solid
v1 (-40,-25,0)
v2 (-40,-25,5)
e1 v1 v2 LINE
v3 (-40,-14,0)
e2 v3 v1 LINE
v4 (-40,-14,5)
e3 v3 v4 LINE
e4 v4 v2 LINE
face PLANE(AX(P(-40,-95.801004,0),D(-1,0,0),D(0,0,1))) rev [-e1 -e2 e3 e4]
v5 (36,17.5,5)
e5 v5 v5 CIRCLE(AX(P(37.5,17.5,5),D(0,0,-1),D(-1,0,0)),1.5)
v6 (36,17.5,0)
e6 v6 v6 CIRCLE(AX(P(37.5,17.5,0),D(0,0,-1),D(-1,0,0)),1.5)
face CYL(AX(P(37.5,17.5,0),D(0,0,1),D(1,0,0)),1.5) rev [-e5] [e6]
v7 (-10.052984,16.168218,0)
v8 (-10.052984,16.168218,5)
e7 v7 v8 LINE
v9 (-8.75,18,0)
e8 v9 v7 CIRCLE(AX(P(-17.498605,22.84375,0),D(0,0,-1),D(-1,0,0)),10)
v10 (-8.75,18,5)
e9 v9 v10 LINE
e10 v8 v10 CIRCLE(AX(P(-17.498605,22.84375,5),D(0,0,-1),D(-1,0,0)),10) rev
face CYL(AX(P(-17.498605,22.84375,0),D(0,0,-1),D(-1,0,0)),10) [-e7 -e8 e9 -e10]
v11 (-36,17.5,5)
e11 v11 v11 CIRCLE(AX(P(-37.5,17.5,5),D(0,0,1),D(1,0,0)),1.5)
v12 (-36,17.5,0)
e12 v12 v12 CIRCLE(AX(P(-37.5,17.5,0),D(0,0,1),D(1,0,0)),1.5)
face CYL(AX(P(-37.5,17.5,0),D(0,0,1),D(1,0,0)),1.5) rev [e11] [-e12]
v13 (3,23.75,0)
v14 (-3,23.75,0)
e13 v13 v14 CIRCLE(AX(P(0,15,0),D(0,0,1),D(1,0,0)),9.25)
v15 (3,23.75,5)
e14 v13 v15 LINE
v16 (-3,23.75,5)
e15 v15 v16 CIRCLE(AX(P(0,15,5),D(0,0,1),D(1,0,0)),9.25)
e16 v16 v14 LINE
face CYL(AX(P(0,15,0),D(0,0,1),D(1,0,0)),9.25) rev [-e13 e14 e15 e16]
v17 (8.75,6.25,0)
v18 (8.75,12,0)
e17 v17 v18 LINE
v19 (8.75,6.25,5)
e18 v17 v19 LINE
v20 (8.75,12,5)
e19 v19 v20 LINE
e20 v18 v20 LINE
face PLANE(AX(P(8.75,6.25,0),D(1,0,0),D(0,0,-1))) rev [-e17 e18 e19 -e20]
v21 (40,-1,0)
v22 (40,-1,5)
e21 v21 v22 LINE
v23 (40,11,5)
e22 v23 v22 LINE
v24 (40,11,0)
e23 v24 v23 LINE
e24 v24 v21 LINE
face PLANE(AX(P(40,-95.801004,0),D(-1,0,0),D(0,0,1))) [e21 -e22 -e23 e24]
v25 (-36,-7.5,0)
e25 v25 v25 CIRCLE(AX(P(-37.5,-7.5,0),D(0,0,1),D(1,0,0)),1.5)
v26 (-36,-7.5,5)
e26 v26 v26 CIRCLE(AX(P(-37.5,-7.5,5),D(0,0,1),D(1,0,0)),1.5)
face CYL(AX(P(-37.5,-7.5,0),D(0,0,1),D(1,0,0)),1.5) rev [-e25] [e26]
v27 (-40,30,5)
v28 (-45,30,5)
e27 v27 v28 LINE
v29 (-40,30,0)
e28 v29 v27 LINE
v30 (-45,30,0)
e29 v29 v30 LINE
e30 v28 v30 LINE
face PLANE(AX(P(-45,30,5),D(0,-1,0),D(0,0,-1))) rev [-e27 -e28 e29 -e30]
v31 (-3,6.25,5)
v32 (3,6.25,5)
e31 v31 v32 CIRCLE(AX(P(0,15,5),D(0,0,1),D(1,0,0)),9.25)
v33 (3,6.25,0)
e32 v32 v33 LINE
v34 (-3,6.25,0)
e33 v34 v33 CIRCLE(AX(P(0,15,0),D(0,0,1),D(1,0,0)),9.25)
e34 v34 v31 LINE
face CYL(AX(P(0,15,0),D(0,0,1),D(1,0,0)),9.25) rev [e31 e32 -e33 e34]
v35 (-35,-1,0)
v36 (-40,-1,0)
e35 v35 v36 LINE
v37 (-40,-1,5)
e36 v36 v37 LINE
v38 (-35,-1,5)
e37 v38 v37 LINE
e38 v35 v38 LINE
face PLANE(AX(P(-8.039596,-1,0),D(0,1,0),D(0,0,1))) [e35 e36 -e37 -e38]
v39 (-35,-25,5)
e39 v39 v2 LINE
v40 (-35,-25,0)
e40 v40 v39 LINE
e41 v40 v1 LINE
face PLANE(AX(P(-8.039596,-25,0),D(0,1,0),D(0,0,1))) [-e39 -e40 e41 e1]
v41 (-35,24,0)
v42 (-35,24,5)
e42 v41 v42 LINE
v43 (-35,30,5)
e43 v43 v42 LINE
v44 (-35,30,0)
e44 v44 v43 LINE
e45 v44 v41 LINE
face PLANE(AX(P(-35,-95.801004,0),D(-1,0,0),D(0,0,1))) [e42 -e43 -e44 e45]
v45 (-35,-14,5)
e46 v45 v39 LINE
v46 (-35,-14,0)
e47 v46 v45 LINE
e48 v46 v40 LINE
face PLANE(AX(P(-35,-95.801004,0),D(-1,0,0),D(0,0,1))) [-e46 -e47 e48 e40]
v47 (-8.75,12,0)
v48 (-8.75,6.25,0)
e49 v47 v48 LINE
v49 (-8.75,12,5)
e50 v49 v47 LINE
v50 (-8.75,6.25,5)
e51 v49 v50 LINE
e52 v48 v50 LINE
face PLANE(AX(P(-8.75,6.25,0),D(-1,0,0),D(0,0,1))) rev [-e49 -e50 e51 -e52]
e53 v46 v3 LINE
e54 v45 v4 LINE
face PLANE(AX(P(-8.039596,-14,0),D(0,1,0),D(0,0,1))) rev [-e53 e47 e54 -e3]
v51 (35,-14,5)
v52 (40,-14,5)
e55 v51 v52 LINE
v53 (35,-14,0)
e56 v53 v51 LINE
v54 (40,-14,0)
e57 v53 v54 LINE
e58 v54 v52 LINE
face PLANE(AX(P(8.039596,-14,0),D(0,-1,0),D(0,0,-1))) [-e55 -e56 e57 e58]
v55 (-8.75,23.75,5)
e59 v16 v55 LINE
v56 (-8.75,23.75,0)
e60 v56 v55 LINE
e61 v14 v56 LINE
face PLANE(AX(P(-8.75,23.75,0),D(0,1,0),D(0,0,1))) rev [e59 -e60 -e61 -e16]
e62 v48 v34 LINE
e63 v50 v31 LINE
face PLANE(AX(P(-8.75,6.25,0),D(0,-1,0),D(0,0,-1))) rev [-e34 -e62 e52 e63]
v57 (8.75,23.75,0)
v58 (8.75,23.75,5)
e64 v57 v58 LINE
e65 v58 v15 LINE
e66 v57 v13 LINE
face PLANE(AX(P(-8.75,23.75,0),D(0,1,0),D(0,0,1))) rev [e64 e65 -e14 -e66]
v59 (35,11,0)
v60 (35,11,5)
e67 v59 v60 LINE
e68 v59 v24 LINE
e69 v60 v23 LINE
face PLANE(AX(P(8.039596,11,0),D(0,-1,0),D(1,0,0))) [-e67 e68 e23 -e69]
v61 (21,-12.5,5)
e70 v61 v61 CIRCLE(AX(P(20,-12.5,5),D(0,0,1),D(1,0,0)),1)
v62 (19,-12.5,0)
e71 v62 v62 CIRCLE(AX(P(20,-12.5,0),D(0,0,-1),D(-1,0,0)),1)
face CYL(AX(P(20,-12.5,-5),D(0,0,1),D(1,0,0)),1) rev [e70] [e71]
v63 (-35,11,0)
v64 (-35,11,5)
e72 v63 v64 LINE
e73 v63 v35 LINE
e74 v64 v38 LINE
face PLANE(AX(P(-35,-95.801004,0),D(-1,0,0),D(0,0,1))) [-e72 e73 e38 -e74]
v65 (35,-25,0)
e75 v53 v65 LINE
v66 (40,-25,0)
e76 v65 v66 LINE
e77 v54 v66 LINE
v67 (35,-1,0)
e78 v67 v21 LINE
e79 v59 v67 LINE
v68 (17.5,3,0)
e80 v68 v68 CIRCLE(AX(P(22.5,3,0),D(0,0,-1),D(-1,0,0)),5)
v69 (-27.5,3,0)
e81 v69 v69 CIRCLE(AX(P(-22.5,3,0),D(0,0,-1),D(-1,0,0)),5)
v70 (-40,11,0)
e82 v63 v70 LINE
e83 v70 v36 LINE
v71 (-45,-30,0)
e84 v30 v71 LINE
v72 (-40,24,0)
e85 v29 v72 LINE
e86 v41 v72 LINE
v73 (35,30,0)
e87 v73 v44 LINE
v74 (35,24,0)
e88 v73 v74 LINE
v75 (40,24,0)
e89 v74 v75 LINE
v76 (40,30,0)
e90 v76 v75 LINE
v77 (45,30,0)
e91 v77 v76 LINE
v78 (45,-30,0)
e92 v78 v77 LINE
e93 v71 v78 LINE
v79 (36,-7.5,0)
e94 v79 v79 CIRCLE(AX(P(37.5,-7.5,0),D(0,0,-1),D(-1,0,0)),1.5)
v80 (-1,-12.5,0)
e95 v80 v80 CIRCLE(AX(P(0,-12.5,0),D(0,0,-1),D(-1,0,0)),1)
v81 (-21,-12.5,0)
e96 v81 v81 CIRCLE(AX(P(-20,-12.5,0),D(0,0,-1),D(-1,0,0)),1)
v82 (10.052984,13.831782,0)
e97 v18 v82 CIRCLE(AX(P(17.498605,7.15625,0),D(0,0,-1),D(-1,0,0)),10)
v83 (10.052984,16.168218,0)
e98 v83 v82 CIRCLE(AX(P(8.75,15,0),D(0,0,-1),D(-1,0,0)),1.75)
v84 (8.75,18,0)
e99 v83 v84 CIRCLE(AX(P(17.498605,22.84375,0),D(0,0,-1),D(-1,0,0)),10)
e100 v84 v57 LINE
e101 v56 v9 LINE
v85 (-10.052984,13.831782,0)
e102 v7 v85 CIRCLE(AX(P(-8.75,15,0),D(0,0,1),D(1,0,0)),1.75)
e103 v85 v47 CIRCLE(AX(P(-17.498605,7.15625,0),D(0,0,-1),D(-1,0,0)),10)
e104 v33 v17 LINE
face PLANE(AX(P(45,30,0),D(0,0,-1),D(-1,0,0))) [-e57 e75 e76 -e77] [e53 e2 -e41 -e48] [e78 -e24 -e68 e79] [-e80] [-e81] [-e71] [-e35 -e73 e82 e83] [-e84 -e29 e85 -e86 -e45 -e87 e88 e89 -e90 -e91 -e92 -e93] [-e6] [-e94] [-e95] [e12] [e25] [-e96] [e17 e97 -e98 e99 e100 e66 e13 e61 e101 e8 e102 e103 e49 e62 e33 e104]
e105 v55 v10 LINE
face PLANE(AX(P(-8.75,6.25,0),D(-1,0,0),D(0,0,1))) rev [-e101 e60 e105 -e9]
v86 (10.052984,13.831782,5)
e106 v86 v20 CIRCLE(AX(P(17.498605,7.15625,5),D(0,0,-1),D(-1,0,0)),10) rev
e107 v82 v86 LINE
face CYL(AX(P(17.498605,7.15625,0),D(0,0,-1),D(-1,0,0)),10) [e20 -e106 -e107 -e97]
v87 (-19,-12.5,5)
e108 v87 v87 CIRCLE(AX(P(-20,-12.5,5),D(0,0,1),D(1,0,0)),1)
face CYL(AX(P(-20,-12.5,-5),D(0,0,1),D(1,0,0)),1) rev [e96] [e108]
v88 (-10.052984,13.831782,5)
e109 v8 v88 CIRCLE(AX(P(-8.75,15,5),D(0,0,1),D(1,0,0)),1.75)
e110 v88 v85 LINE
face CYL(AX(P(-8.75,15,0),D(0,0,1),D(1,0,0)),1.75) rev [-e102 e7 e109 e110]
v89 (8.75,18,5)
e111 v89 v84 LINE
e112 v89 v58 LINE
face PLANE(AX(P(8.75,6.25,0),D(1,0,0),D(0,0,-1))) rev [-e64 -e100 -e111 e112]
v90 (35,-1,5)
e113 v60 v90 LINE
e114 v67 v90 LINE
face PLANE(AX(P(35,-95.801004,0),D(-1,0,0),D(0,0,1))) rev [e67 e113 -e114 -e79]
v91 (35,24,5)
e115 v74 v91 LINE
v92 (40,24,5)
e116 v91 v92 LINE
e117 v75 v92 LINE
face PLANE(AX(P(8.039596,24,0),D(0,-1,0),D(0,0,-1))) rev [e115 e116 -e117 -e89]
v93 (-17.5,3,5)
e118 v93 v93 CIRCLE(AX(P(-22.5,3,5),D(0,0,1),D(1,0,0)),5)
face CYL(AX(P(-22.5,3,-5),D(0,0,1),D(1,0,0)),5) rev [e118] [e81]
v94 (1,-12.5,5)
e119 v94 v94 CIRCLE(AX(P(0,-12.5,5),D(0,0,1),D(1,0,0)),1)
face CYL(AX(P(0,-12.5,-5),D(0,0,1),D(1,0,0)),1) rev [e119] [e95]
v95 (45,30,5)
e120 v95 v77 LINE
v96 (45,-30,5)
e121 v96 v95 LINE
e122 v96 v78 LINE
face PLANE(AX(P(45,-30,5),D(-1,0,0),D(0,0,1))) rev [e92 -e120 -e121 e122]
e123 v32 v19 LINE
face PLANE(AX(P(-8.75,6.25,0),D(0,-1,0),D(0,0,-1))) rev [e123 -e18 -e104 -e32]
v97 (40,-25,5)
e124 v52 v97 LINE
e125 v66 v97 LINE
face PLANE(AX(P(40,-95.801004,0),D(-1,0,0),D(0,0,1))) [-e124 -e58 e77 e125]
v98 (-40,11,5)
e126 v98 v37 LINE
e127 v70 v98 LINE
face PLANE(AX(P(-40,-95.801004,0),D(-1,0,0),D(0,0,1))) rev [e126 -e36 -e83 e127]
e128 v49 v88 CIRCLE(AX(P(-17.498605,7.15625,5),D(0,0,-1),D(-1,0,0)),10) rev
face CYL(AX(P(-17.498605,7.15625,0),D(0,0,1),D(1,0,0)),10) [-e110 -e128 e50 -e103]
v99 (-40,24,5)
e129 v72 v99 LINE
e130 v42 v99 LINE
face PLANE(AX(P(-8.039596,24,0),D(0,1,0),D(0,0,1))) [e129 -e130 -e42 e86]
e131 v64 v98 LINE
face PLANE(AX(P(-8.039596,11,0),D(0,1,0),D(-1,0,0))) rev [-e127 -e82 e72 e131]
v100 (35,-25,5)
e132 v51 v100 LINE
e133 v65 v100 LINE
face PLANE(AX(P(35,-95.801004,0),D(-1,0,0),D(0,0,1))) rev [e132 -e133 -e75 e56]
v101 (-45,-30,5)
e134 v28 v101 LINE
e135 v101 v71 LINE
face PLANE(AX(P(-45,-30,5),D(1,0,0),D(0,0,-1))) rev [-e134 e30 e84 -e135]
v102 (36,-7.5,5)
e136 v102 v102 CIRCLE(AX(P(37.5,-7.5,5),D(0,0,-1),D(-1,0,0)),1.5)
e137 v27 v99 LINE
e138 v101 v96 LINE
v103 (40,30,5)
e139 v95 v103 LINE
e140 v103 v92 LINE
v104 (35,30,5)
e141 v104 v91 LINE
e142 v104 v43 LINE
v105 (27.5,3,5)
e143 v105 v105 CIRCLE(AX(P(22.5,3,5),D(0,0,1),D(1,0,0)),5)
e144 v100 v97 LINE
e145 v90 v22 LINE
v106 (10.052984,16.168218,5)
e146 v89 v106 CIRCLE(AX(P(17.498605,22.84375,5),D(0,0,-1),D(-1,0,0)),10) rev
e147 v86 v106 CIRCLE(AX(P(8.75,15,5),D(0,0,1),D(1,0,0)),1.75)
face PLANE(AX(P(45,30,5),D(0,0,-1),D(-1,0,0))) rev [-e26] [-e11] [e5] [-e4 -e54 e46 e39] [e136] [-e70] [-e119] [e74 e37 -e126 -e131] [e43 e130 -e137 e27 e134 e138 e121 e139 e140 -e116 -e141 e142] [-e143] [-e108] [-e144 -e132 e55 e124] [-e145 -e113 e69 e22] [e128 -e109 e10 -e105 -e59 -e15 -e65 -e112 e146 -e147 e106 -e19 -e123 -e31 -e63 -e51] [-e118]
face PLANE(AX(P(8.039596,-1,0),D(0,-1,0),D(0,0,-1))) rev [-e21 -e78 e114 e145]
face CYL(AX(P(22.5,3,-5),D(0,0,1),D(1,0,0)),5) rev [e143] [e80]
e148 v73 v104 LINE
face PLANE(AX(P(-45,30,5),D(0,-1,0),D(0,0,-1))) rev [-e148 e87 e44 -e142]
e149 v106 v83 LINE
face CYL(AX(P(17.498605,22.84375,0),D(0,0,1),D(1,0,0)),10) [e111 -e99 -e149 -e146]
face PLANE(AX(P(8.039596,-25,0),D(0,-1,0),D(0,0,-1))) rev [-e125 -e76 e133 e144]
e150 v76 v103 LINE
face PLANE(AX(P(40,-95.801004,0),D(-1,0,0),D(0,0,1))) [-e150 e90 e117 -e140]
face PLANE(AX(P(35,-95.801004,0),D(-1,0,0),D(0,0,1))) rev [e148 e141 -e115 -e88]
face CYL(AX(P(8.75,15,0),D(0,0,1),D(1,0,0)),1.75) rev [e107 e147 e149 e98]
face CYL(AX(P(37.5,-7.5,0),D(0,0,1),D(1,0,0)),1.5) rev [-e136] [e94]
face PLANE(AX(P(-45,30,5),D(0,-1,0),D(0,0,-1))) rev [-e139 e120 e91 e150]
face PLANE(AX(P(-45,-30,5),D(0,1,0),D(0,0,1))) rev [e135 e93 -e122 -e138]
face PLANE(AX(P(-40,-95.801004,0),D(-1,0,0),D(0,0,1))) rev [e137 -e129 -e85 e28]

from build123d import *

# Parameters (mm, degrees)
SKETCH1_W           = 90
SKETCH1_H           = 60
BOSS_EXTRUDE1_DEPTH = 5
SKETCH3_R           = 9.25
CUT_EXTRUDE2_DEPTH  = 5
SKETCH4_W           = 17.5
SKETCH4_H           = 17.5
CUT_EXTRUDE3_DEPTH  = 5
SKETCH5_R           = 1.75
CUT_EXTRUDE4_DEPTH  = 5
SKETCH6_R           = 5
SKETCH6_R_2         = 1
CUT_EXTRUDE5_DEPTH  = 10
FILLET1_R           = 10
SKETCH7_W           = 5
SKETCH7_H           = 11
SKETCH7_H_2         = 12
SKETCH7_R           = 1.5
CUT_EXTRUDE6_DEPTH  = 5


with BuildPart() as part:
    # Sketch1 → Boss-Extrude1 (new body)
    with BuildSketch(Plane.XY):
        Rectangle(SKETCH1_W, SKETCH1_H)
    extrude(amount=BOSS_EXTRUDE1_DEPTH)

    # Sketch3 → Cut-Extrude2 (cut)
    with BuildSketch(Plane.XY.offset(5)):
        with Locations((0, 15)):
            Circle(SKETCH3_R)
    extrude(amount=-CUT_EXTRUDE2_DEPTH, mode=Mode.SUBTRACT)

    # Sketch4 → Cut-Extrude3 (cut)
    with BuildSketch(Plane.XY.offset(5)):
        with Locations((0, 15)):
            Rectangle(SKETCH4_W, SKETCH4_H)
    extrude(amount=-CUT_EXTRUDE3_DEPTH, mode=Mode.SUBTRACT)

    # Sketch5 → Cut-Extrude4 (cut)
    with BuildSketch(Plane.XY.offset(5)):
        with Locations((-8.75, 15)):
            Circle(SKETCH5_R)
        with Locations((8.75, 15)):
            Circle(SKETCH5_R)
    extrude(amount=-CUT_EXTRUDE4_DEPTH, mode=Mode.SUBTRACT)

    # Sketch6 → Cut-Extrude5 (cut)
    with BuildSketch(Plane.XY.offset(5)):
        with Locations((-22.5, 3)):
            Circle(SKETCH6_R)
        with Locations((22.5, 3)):
            Circle(SKETCH6_R)
        with Locations((-20, -12.5)):
            Circle(SKETCH6_R_2)
        with Locations((0, -12.5)):
            Circle(SKETCH6_R_2)
        with Locations((20, -12.5)):
            Circle(SKETCH6_R_2)
    extrude(amount=-CUT_EXTRUDE5_DEPTH, mode=Mode.SUBTRACT)

    # Fillet1
    # the kernel refuses this fillet: 10 mm, written as the material it takes off along each edge
    with BuildSketch(Plane(origin=(9.089285714, 13.283204962, -3.318254218), x_dir=(0.8690606948283255, 0.4947054767278286, 0), z_dir=(0, 0, 1))) as fillet1_piece_1:
        with BuildLine():
            CenterArc((4.277170512, -9.484831943), FILLET1_R, 108.471170307, 12.906966453)
            Line((-0.929668401, -0.947336494), (-1.033805179, -0.776586585))
            ThreePointArc((-1.033805179, -0.776586585), (-0.590566588, -0.350280804), (-0.152428823, 0.129481481))
            Line((-0.152428823, 0.129481481), (0.063365489, 0.189696639))
            ThreePointArc((0.063365489, 0.189696639), (0.554448029, 0.10984559), (1.04553057, 0.189696639))
            Line((1.04553057, 0.189696639), (1.108896059, 0))
        make_face()
    extrude(amount=11.636508437, mode=Mode.SUBTRACT)
    with BuildSketch(Plane(origin=(9.089285714, 16.716795038, -3.318254218), x_dir=(-0.255620645644957, 0.9667771643559105, 0), z_dir=(0, 0, 1))) as fillet1_piece_2:
        with BuildLine():
            CenterArc((3.77380457, -9.696113842), FILLET1_R, 104.1611678, 12.906966453)
            Line((-0.776692771, -0.791453605), (-0.867702718, -0.6133604))
            ThreePointArc((-0.867702718, -0.6133604), (-0.466746599, -0.318788775), (-0.179774835, 0.087641364))
            Line((-0.179774835, 0.087641364), (0.014349207, 0.199484586))
            ThreePointArc((0.014349207, 0.199484586), (0.663650844, 0.176162125), (1.27837163, 0.193922277))
            Line((1.27837163, 0.193922277), (1.327301687, 0))
        make_face()
    extrude(amount=11.636508437, mode=Mode.SUBTRACT)
    with BuildSketch(Plane(origin=(-9.089285714, 16.716795038, -3.318254218), x_dir=(0.25562064564495884, 0.9667771643559101, 0), z_dir=(0, 0, 1))) as fillet1_piece_3:
        with BuildLine():
            CenterArc((3.77380457, 9.696113842), FILLET1_R, 242.931865747, 12.906966453)
            Line((-0.776692771, 0.791453605), (-0.867702718, 0.6133604))
            ThreePointArc((-0.867702718, 0.6133604), (-0.466746599, 0.318788775), (-0.179774835, -0.087641364))
            Line((-0.179774835, -0.087641364), (0.014349207, -0.199484586))
            ThreePointArc((0.014349207, -0.199484586), (0.663650844, -0.176162125), (1.27837163, -0.193922277))
            Line((1.27837163, -0.193922277), (1.327301687, 0))
        make_face()
    extrude(amount=11.636508437, mode=Mode.SUBTRACT)
    with BuildSketch(Plane(origin=(-9.089285714, 13.283204962, -3.318254218), x_dir=(-0.8690606948283244, 0.4947054767278305, 0), z_dir=(0, 0, 1))) as fillet1_piece_4:
        with BuildLine():
            CenterArc((4.277170512, 9.484831943), FILLET1_R, 238.62186324, 12.906966453)
            Line((-0.929668401, 0.947336494), (-1.033805179, 0.776586585))
            ThreePointArc((-1.033805179, 0.776586585), (-0.590566588, 0.350280804), (-0.152428823, -0.129481481))
            Line((-0.152428823, -0.129481481), (0.063365489, -0.189696639))
            ThreePointArc((0.063365489, -0.189696639), (0.554448029, -0.10984559), (1.04553057, -0.189696639))
            Line((1.04553057, -0.189696639), (1.108896059, 0))
        make_face()
    extrude(amount=11.636508437, mode=Mode.SUBTRACT)

    # Sketch7 → Cut-Extrude6 (cut)
    with BuildSketch(Plane.XY.offset(5)):
        with Locations((-37.5, 29.5)):
            Rectangle(SKETCH7_W, SKETCH7_H)
        with Locations((-37.5, 5)):
            Rectangle(SKETCH7_W, SKETCH7_H_2)
        with Locations((-37.5, -19.5)):
            Rectangle(SKETCH7_W, SKETCH7_H)
        with Locations((-37.5, 17.5)):
            Circle(SKETCH7_R)
        with Locations((-37.5, -7.5)):
            Circle(SKETCH7_R)
    cut_extrude6 = extrude(amount=-CUT_EXTRUDE6_DEPTH, mode=Mode.SUBTRACT)

    # Mirror1: Cut-Extrude6 across plane
    add(cut_extrude6.mirror(Plane(origin=(0, 0, 0), x_dir=(0, 0, 1), z_dir=(1, 0, 0))), mode=Mode.SUBTRACT)


solid = part.part
